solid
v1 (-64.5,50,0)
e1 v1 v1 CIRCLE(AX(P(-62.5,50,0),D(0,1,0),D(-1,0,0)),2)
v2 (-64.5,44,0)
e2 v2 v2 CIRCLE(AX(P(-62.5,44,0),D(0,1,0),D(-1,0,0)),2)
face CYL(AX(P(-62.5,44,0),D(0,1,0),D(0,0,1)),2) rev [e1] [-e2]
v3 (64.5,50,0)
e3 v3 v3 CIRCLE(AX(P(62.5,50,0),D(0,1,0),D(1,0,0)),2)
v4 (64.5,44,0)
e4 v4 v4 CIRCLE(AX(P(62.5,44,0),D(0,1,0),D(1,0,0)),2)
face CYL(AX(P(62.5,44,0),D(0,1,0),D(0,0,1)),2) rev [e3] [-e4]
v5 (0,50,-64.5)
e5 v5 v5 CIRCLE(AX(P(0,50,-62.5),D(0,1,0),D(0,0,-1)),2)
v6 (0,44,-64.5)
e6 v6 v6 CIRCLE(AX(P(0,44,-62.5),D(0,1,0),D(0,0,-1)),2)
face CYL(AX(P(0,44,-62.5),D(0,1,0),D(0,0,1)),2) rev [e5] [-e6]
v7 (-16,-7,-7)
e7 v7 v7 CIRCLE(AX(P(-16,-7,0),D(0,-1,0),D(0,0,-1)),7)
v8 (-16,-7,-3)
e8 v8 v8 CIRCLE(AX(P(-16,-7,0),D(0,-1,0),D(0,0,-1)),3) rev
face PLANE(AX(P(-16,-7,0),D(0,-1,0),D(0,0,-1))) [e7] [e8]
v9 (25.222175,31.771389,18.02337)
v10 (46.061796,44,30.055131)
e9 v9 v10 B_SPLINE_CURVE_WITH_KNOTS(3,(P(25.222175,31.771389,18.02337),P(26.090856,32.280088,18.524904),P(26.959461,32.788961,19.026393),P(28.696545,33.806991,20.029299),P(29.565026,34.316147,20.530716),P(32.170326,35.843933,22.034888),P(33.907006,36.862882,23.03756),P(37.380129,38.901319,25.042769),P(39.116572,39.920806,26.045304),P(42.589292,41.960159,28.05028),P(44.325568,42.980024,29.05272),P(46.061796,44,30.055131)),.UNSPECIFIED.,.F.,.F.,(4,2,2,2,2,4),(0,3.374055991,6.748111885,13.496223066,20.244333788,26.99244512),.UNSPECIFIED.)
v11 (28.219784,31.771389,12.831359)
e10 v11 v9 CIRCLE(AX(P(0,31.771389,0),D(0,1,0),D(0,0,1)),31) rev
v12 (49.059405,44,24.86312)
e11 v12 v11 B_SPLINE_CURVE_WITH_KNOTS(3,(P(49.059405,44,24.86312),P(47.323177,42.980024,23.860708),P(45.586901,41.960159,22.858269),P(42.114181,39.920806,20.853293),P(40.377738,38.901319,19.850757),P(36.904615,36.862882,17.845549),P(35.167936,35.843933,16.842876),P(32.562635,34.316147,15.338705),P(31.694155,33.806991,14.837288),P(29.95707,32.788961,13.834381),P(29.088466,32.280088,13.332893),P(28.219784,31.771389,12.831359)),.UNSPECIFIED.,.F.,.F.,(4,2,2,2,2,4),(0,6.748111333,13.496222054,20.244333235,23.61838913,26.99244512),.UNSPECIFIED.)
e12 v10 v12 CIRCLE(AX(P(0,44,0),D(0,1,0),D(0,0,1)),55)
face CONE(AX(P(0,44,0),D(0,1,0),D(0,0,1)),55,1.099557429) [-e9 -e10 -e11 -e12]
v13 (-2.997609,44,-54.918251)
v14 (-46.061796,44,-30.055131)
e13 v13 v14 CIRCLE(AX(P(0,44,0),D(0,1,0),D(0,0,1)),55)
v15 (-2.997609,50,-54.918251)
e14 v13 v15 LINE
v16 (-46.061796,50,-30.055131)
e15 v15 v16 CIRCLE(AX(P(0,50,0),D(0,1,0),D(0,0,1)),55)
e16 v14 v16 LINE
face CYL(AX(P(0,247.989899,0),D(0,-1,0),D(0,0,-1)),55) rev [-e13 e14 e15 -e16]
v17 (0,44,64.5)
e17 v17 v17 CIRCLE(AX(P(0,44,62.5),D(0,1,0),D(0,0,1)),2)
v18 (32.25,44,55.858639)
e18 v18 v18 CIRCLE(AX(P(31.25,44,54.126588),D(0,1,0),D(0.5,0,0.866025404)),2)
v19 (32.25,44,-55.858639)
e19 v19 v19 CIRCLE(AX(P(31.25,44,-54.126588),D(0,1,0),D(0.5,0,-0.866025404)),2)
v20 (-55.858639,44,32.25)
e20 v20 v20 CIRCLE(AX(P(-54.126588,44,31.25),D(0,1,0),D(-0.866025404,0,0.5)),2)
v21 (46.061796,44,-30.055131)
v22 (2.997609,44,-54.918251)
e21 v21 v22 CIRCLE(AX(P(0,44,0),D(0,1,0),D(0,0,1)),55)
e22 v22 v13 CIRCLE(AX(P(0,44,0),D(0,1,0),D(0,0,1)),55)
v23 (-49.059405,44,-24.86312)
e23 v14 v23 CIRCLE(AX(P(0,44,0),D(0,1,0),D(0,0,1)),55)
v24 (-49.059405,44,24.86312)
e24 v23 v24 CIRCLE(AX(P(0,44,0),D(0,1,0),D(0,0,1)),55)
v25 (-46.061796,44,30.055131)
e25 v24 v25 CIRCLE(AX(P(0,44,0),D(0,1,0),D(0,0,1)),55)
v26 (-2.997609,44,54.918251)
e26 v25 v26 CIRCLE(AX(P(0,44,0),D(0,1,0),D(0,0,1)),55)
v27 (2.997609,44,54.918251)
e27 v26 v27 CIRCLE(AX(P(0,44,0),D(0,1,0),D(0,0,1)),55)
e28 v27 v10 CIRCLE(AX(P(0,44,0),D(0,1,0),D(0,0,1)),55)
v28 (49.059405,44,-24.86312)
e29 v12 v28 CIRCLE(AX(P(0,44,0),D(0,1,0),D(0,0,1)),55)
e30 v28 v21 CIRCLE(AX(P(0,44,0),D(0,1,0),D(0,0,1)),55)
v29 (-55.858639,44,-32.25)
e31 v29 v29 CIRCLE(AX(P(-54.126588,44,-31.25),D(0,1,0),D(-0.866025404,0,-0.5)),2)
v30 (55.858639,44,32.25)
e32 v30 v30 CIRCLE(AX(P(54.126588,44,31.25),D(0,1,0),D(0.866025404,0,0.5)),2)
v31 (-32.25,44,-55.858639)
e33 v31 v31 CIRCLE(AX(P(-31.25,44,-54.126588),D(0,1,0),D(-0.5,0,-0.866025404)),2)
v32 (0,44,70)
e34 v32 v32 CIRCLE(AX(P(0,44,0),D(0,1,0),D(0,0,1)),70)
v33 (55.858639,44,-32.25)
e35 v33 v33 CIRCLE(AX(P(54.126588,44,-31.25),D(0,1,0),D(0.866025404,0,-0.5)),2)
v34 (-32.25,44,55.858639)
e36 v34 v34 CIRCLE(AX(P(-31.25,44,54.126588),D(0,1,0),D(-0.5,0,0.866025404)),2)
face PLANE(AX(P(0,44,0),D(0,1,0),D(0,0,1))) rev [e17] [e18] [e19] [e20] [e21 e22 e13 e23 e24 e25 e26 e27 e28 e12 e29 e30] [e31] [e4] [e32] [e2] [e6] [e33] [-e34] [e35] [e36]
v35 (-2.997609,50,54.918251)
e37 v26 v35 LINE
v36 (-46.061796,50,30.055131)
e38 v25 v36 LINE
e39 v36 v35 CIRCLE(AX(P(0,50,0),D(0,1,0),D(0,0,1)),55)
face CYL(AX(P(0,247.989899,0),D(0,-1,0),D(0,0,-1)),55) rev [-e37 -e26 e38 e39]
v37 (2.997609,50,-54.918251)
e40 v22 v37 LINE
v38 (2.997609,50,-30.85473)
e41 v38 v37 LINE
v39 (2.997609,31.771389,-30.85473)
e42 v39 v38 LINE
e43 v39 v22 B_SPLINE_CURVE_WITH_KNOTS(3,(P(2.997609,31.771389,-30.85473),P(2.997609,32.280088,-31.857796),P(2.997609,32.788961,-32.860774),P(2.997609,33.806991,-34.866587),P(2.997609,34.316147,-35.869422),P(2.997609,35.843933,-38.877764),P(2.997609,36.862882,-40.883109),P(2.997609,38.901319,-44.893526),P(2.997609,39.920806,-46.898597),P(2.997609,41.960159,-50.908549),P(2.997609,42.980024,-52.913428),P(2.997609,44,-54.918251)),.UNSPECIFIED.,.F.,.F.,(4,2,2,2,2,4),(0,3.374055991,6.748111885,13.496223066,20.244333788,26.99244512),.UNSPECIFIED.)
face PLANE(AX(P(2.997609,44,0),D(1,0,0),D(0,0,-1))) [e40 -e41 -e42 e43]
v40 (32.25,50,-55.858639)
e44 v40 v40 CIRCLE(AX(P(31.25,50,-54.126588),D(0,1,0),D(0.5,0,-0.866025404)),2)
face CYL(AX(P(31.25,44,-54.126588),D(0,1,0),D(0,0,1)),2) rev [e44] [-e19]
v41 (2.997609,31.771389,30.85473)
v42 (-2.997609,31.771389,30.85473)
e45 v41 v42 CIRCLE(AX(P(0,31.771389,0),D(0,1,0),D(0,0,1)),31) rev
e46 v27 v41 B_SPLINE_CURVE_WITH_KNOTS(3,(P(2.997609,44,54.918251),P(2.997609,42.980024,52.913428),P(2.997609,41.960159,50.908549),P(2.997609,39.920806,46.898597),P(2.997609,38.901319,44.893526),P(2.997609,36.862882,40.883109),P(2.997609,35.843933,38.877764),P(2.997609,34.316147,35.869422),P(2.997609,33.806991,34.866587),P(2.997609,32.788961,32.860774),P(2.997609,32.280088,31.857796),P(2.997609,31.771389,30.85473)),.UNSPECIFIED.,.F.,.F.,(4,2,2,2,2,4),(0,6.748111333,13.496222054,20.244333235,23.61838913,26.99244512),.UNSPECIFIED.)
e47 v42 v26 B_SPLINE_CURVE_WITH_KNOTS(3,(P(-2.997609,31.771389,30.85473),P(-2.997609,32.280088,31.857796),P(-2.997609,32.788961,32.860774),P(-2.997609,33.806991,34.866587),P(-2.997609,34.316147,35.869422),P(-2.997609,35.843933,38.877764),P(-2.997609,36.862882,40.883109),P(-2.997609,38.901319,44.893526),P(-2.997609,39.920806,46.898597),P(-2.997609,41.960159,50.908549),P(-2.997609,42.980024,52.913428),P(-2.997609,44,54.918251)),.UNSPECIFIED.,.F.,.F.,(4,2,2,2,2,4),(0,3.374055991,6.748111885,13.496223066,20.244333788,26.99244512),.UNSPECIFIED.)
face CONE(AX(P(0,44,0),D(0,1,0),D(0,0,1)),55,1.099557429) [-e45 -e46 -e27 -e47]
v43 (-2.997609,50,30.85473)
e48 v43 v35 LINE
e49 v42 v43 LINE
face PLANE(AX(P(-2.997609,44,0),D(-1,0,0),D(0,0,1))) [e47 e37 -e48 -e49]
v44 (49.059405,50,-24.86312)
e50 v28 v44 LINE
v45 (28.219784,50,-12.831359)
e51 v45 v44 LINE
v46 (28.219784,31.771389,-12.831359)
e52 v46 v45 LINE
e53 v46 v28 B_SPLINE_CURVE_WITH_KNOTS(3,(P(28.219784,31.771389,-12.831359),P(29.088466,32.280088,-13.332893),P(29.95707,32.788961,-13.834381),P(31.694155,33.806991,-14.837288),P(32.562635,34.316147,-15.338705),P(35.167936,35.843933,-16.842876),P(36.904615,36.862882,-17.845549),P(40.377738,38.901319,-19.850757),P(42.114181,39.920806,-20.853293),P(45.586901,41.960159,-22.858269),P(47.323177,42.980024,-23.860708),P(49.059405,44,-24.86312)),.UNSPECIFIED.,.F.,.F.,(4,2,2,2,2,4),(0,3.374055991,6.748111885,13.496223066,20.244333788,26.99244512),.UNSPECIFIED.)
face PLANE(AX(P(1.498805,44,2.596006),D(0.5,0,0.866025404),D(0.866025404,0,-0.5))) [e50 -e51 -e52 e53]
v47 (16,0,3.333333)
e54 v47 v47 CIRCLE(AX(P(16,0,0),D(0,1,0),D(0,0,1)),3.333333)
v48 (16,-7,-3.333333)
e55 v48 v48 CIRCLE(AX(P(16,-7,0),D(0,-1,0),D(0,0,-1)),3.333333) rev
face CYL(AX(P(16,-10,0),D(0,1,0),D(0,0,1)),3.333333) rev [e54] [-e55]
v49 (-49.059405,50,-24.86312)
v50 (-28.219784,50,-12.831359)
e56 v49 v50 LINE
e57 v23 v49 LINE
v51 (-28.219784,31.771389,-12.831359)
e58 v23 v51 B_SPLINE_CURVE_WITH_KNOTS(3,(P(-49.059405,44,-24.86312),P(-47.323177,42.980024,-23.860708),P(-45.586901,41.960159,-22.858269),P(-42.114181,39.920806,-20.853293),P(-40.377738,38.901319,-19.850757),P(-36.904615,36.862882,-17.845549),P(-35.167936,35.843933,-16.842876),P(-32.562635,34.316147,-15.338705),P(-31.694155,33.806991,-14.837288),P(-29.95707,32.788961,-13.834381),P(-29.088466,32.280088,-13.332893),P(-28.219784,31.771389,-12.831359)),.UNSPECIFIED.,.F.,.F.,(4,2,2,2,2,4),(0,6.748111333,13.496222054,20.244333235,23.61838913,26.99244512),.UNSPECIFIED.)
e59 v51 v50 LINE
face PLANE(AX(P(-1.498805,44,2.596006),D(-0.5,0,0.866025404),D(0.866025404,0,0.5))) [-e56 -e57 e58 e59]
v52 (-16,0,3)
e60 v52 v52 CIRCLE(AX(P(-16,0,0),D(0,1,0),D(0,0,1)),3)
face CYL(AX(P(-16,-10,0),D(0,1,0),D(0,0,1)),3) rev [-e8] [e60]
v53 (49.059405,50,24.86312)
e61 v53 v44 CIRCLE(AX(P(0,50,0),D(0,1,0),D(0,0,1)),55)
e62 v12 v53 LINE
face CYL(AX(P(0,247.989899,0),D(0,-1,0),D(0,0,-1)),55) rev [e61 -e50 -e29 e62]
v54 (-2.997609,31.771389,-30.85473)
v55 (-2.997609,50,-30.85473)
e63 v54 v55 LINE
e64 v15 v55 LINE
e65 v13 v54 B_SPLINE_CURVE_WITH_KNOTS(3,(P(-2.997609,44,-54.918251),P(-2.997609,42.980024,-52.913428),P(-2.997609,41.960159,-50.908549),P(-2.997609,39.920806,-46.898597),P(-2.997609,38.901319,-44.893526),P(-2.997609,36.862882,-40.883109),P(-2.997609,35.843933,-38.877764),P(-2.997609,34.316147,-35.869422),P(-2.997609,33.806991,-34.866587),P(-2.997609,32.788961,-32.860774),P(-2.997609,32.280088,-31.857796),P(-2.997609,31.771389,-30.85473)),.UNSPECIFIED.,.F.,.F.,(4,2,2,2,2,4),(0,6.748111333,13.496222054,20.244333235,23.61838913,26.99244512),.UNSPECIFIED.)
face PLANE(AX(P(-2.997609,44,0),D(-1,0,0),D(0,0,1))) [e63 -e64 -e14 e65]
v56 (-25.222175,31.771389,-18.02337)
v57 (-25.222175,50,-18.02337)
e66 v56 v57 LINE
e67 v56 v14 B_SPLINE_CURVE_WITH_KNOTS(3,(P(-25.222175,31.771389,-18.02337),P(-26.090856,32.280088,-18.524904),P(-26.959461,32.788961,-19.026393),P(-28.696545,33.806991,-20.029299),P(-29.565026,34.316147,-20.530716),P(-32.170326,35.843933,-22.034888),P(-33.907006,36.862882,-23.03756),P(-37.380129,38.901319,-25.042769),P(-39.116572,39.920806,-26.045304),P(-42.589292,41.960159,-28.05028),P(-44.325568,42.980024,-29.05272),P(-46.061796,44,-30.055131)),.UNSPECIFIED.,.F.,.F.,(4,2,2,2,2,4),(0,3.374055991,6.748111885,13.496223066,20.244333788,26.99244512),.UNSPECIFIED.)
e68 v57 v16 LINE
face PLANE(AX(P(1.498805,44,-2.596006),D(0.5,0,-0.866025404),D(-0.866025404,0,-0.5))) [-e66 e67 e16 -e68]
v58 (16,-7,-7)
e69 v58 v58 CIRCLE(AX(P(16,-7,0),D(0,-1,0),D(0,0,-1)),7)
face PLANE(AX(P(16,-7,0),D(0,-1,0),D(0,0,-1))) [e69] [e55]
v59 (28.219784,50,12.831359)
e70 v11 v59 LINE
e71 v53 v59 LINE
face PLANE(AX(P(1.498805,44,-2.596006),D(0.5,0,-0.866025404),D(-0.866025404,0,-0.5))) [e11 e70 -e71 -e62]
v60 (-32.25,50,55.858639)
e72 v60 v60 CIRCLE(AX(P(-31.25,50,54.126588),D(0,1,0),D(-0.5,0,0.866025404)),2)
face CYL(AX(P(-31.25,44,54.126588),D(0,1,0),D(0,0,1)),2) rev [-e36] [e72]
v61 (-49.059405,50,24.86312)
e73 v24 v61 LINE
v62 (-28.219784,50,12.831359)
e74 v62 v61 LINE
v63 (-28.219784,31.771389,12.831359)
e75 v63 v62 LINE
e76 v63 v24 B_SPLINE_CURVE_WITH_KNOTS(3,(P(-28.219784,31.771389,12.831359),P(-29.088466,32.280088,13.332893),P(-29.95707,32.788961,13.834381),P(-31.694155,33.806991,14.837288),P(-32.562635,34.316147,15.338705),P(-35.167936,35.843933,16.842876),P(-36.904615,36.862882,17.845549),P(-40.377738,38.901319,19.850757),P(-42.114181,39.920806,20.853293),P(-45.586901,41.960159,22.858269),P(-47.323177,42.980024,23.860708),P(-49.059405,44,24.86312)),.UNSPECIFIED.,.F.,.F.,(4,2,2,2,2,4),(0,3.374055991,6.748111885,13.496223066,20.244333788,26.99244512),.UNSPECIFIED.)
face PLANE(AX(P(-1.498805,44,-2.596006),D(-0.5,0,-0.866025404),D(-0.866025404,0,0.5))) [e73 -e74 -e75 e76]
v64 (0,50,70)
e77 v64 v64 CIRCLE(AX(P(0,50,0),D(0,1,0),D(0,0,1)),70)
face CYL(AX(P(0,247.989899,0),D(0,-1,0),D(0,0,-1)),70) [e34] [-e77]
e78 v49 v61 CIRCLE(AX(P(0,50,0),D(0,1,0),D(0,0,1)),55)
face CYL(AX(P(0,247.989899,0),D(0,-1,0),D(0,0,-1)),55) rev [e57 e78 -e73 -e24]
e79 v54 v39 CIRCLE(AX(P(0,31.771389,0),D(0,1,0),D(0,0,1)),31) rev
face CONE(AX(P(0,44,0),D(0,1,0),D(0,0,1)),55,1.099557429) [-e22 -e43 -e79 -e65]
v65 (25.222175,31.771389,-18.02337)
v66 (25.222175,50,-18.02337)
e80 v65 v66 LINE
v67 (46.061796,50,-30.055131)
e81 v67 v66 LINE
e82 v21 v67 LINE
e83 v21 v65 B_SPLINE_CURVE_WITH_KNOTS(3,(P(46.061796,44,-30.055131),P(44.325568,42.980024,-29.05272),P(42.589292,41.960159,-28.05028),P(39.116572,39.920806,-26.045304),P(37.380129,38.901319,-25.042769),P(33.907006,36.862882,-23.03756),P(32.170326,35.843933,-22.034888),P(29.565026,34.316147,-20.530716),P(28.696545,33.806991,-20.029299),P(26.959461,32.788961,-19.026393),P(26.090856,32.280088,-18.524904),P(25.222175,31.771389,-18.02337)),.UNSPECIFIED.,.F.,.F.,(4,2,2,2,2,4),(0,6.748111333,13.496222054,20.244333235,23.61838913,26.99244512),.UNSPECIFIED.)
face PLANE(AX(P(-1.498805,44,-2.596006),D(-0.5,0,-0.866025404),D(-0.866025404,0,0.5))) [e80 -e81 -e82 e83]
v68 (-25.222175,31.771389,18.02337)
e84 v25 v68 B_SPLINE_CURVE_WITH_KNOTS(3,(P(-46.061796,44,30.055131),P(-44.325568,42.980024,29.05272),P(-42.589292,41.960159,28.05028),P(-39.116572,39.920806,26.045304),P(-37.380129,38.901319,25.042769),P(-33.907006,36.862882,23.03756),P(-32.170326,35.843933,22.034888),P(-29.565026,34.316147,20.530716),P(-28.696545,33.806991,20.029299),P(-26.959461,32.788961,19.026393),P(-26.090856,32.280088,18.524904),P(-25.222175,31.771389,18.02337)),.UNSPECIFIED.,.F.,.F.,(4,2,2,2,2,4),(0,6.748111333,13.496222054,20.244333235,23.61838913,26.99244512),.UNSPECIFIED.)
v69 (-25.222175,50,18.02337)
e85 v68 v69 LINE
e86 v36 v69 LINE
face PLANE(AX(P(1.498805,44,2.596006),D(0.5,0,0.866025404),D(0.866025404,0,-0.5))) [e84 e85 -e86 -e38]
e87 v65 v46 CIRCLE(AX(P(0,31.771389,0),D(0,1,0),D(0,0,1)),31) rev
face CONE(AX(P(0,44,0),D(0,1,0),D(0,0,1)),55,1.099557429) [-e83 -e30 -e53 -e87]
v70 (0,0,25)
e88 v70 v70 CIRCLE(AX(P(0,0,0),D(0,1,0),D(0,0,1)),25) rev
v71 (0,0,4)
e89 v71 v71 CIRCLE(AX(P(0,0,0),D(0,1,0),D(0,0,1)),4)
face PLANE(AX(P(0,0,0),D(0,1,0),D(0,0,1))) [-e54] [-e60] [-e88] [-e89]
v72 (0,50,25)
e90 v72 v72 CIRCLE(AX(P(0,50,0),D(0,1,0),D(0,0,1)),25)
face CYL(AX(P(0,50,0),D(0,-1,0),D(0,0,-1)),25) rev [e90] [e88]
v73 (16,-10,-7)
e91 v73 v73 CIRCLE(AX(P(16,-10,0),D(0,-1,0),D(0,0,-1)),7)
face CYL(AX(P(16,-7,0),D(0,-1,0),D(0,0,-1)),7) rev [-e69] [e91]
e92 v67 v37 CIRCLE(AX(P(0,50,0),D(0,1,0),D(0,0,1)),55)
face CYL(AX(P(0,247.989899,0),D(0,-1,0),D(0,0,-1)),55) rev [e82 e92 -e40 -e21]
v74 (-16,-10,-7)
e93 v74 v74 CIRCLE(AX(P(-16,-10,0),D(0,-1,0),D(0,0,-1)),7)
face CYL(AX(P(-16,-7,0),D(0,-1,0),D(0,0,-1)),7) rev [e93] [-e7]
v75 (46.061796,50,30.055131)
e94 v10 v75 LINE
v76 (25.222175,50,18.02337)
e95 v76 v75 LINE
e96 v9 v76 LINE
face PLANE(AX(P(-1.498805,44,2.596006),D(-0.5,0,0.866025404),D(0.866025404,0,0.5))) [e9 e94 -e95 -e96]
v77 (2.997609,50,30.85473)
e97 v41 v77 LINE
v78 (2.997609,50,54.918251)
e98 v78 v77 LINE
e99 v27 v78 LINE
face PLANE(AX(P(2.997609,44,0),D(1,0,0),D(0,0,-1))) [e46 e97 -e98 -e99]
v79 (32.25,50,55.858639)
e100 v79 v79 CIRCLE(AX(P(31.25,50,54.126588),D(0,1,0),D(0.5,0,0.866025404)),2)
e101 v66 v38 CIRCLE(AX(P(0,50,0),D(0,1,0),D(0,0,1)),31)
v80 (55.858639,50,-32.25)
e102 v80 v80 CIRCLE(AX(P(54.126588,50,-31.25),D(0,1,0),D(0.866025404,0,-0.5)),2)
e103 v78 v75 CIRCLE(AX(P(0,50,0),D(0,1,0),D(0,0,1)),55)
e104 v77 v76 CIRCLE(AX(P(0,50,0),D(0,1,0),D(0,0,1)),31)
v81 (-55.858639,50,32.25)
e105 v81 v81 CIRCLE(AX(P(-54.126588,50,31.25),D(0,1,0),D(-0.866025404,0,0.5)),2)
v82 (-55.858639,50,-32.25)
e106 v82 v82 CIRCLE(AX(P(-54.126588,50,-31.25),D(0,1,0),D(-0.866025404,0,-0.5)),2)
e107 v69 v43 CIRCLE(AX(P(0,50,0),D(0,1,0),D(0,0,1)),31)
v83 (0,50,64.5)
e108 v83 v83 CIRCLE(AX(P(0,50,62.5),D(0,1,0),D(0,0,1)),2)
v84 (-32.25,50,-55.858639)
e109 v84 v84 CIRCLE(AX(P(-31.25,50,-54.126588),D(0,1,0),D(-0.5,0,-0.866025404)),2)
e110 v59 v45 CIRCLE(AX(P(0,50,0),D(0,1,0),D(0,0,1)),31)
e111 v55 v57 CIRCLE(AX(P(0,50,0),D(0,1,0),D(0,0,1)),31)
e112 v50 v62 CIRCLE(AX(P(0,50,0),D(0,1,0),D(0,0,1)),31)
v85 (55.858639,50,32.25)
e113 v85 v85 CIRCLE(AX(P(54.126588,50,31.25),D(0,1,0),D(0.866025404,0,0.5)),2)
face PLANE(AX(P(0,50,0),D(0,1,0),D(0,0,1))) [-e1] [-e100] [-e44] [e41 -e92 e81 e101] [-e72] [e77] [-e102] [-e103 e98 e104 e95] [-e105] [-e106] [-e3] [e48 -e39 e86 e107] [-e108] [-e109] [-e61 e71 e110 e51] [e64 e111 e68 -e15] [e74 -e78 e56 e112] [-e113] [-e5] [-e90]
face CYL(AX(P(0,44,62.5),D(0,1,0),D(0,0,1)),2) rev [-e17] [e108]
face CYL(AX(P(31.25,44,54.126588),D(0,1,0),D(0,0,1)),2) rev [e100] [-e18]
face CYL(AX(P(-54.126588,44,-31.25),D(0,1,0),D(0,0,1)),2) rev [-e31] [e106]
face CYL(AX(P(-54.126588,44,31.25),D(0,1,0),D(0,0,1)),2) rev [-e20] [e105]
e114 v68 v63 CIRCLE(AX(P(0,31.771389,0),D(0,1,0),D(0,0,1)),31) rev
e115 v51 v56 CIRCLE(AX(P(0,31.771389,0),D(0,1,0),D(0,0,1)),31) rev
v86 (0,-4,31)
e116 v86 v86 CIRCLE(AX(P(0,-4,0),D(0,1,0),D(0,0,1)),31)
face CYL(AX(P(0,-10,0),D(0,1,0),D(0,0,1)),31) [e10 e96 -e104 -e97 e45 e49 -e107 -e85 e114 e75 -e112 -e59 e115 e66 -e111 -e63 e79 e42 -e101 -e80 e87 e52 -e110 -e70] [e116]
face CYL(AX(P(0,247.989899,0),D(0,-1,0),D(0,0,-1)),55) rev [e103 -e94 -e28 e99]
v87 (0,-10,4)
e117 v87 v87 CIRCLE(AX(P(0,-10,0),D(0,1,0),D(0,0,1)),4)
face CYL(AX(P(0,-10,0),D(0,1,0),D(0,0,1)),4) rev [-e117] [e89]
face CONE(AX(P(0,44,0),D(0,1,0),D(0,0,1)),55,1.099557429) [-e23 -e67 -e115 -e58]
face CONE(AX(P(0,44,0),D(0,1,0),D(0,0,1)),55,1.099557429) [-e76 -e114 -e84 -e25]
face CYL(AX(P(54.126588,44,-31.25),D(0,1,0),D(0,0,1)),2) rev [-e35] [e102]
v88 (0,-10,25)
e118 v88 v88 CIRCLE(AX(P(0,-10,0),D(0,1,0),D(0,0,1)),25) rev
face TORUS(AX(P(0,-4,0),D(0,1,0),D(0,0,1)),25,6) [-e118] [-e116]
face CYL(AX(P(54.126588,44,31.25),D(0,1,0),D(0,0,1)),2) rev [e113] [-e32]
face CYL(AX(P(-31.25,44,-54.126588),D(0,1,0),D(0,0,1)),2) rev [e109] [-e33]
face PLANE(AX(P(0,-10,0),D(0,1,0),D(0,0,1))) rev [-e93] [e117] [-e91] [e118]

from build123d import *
from OCP.BRepFilletAPI import BRepFilletAPI_MakeChamfer

# Parameters (mm, degrees)
SKETCH2_R           = 31
SKETCH2_R_2         = 25
SKETCH2_R_3         = 4
SKETCH2_R_4         = 3
SKETCH2_R_5         = 3.333333333
BOSS_EXTRUDE1_DEPTH = 10
BOSS_EXTRUDE2_START = 50
SKETCH2_3_R         = 31
SKETCH2_3_R_2       = 25
BOSS_EXTRUDE2_DEPTH = 50
FILLET1_R           = 6
SKETCH3_R           = 7
CUT_EXTRUDE1_DEPTH  = 3
BOSS_EXTRUDE3_DEPTH = 6
CIRPATTERN1_COUNT   = 6
BOSS_EXTRUDE4_START = 44
SKETCH6_R           = 70
SKETCH6_R_2         = 55
BOSS_EXTRUDE4_DEPTH = 6
CHAMFER1_SIZE       = 12.228610788
CHAMFER1_SIZE_2     = 24
CUT_EXTRUDE2_DEPTH  = 6
CIRPATTERN2_COUNT   = 12


with BuildPart() as part:
    # Sketch2 → Boss-Extrude1 (new body)
    # profile 1 of 2: a face of its own
    with BuildSketch(Plane(origin=(0, 0, 0), x_dir=(1, 0, 0), z_dir=(0, 1, 0))):
        with Locations(Location((0, 0, 0), (0, 0, 270))):
            Circle(SKETCH2_R)
        Circle(SKETCH2_R_2, mode=Mode.SUBTRACT)
    # profile 2 of 2: a face of its own
    with BuildSketch(Plane(origin=(0, 0, 0), x_dir=(1, 0, 0), z_dir=(0, 1, 0))):
        Circle(SKETCH2_R_2)
        with Locations(Location((0, 0, 0), (0, 0, 270))):
            Circle(SKETCH2_R_3, mode=Mode.SUBTRACT)
        with Locations(Location((-16, 0, 0), (0, 0, 270))):
            Circle(SKETCH2_R_4, mode=Mode.SUBTRACT)
        with Locations(Location((16, 0, 0), (0, 0, 270))):
            Circle(SKETCH2_R_5, mode=Mode.SUBTRACT)
    extrude(amount=-BOSS_EXTRUDE1_DEPTH)

    # Sketch2<3> → Boss-Extrude2 (add)
    with BuildSketch(Plane(origin=(0, 0, 0), x_dir=(1, 0, 0), z_dir=(0, 1, 0)).offset(BOSS_EXTRUDE2_START)):
        with Locations(Location((0, 0, 0), (0, 0, 270))):
            Circle(SKETCH2_3_R)
        with Locations(Location((0, 0, 0), (0, 0, 270))):
            Circle(SKETCH2_3_R_2, mode=Mode.SUBTRACT)
    extrude(amount=-BOSS_EXTRUDE2_DEPTH)

    # Fillet1
    fillet1_edges = [part.edges().sort_by_distance(p)[0] for p in [
        (0, -10, -31),
    ]]
    fillet(fillet1_edges, radius=FILLET1_R)

    # Sketch3 → Cut-Extrude1 (cut)
    with BuildSketch(Plane.XZ.offset(10)):
        with Locations(Location((16, 0, 0), (0, 0, 270))):
            Circle(SKETCH3_R)
        with Locations(Location((-16, 0, 0), (0, 0, 270))):
            Circle(SKETCH3_R)
    extrude(amount=-CUT_EXTRUDE1_DEPTH, mode=Mode.SUBTRACT)

    # Sketch4 → Boss-Extrude3 (add)
    with BuildSketch(Plane(origin=(0, 50, 0), x_dir=(1, 0, 0), z_dir=(0, 1, 0))):
        with BuildLine():
            ThreePointArc((0, 31), (1.500563555, 30.963661105), (2.997609122, 30.854729614))
            Line((2.997609122, 30.854729614), (2.997609122, 54.918251425))
            ThreePointArc((2.997609122, 54.918251425), (1.499361804, 54.979559058), (0, 55))
            Line((0, 55), (0, 31))
        make_face()
        with BuildLine():
            ThreePointArc((-2.997609122, 30.854729614), (-1.500563555, 30.963661105), (0, 31))
            Line((0, 31), (0, 55))
            ThreePointArc((0, 55), (-1.499361804, 54.979559058), (-2.997609122, 54.918251425))
            Line((-2.997609122, 54.918251425), (-2.997609122, 30.854729614))
        make_face()
    boss_extrude3 = extrude(amount=-BOSS_EXTRUDE3_DEPTH)

    # CirPattern1: Boss-Extrude3 ×6 about axis
    cirpattern1_axis = Axis((0, 0, 0), (0, 1, 0))
    for i in range(1, CIRPATTERN1_COUNT):
        add(boss_extrude3.rotate(cirpattern1_axis, i * 360 / CIRPATTERN1_COUNT))

    # Sketch6 → Boss-Extrude4 (add)
    with BuildSketch(Plane(origin=(0, 0, 0), x_dir=(1, 0, 0), z_dir=(0, 1, 0)).offset(BOSS_EXTRUDE4_START)):
        with Locations(Location((0, 0, 0), (0, 0, 270))):
            Circle(SKETCH6_R)
        Circle(SKETCH6_R_2, mode=Mode.SUBTRACT)
    extrude(amount=BOSS_EXTRUDE4_DEPTH)

    # Chamfer1
    chamfer1_edges_1 = [part.edges().sort_by_distance(p)[0] for p in [
        (0, 44, -31),
    ]]
    chamfer1_side_1 = [part.faces().sort_by_distance(p)[0] for p in [
        (0, 43.755427784, -31),
    ]]
    chamfer1_edges_2 = [part.edges().sort_by_distance(p)[0] for p in [
        (-26.846787517, 44, 15.5),
    ]]
    chamfer1_side_2 = [part.faces().sort_by_distance(p)[0] for p in [
        (-26.846787517, 43.755427784, 15.5),
    ]]
    chamfer1_edges_3 = [part.edges().sort_by_distance(p)[0] for p in [
        (-26.846787517, 44, -15.5),
    ]]
    chamfer1_side_3 = [part.faces().sort_by_distance(p)[0] for p in [
        (-26.846787517, 43.755427784, -15.5),
    ]]
    chamfer1_edges_4 = [part.edges().sort_by_distance(p)[0] for p in [
        (26.846787517, 44, -15.5),
    ]]
    chamfer1_side_4 = [part.faces().sort_by_distance(p)[0] for p in [
        (26.846787517, 43.755427784, -15.5),
    ]]
    chamfer1_edges_5 = [part.edges().sort_by_distance(p)[0] for p in [
        (26.846787517, 44, 15.5),
    ]]
    chamfer1_side_5 = [part.faces().sort_by_distance(p)[0] for p in [
        (26.846787517, 43.755427784, 15.5),
    ]]
    chamfer1_edges_6 = [part.edges().sort_by_distance(p)[0] for p in [
        (1.500563555, 44, 30.963661105),
    ]]
    chamfer1_side_6 = [part.faces().sort_by_distance(p)[0] for p in [
        (1.500563555, 43.755427784, 30.963661105),
    ]]
    chamfer1 = BRepFilletAPI_MakeChamfer(part.part.solid().wrapped)
    for e in chamfer1_edges_1:
        chamfer1.Add(CHAMFER1_SIZE - 0.0001, CHAMFER1_SIZE_2 - 0.0001, e.wrapped, chamfer1_side_1[0].wrapped)
    for e in chamfer1_edges_2:
        chamfer1.Add(CHAMFER1_SIZE - 0.0001, CHAMFER1_SIZE_2 - 0.0001, e.wrapped, chamfer1_side_2[0].wrapped)
    for e in chamfer1_edges_3:
        chamfer1.Add(CHAMFER1_SIZE - 0.0001, CHAMFER1_SIZE_2 - 0.0001, e.wrapped, chamfer1_side_3[0].wrapped)
    for e in chamfer1_edges_4:
        chamfer1.Add(CHAMFER1_SIZE - 0.0001, CHAMFER1_SIZE_2 - 0.0001, e.wrapped, chamfer1_side_4[0].wrapped)
    for e in chamfer1_edges_5:
        chamfer1.Add(CHAMFER1_SIZE - 0.0001, CHAMFER1_SIZE_2 - 0.0001, e.wrapped, chamfer1_side_5[0].wrapped)
    for e in chamfer1_edges_6:
        chamfer1.Add(CHAMFER1_SIZE - 0.0001, CHAMFER1_SIZE_2 - 0.0001, e.wrapped, chamfer1_side_6[0].wrapped)
    add(Compound.cast(chamfer1.Shape()), mode=Mode.REPLACE)  # a hair under: the kernel refuses the full size

    # Sketch7 → Cut-Extrude2 (cut)
    with BuildSketch(Plane(origin=(0, 50, 0), x_dir=(1, 0, 0), z_dir=(0, 1, 0))):
        with BuildLine():
            ThreePointArc((0, -60.5), (-2, -62.5), (0, -64.5))
            Line((0, -64.5), (0, -60.5))
        make_face()
        with BuildLine():
            Line((0, -60.5), (0, -64.5))
            ThreePointArc((0, -64.5), (1.414213562, -63.914213562), (2, -62.5))
            ThreePointArc((2, -62.5), (1.414213562, -61.085786438), (0, -60.5))
        make_face()
    cut_extrude2 = extrude(amount=-CUT_EXTRUDE2_DEPTH, mode=Mode.SUBTRACT)

    # CirPattern2: Cut-Extrude2 ×12 about axis
    cirpattern2_axis = Axis((0, 0, 0), (0, 1, 0))
    for i in range(1, CIRPATTERN2_COUNT):
        add(cut_extrude2.rotate(cirpattern2_axis, i * 360 / CIRPATTERN2_COUNT), mode=Mode.SUBTRACT)


solid = part.part
